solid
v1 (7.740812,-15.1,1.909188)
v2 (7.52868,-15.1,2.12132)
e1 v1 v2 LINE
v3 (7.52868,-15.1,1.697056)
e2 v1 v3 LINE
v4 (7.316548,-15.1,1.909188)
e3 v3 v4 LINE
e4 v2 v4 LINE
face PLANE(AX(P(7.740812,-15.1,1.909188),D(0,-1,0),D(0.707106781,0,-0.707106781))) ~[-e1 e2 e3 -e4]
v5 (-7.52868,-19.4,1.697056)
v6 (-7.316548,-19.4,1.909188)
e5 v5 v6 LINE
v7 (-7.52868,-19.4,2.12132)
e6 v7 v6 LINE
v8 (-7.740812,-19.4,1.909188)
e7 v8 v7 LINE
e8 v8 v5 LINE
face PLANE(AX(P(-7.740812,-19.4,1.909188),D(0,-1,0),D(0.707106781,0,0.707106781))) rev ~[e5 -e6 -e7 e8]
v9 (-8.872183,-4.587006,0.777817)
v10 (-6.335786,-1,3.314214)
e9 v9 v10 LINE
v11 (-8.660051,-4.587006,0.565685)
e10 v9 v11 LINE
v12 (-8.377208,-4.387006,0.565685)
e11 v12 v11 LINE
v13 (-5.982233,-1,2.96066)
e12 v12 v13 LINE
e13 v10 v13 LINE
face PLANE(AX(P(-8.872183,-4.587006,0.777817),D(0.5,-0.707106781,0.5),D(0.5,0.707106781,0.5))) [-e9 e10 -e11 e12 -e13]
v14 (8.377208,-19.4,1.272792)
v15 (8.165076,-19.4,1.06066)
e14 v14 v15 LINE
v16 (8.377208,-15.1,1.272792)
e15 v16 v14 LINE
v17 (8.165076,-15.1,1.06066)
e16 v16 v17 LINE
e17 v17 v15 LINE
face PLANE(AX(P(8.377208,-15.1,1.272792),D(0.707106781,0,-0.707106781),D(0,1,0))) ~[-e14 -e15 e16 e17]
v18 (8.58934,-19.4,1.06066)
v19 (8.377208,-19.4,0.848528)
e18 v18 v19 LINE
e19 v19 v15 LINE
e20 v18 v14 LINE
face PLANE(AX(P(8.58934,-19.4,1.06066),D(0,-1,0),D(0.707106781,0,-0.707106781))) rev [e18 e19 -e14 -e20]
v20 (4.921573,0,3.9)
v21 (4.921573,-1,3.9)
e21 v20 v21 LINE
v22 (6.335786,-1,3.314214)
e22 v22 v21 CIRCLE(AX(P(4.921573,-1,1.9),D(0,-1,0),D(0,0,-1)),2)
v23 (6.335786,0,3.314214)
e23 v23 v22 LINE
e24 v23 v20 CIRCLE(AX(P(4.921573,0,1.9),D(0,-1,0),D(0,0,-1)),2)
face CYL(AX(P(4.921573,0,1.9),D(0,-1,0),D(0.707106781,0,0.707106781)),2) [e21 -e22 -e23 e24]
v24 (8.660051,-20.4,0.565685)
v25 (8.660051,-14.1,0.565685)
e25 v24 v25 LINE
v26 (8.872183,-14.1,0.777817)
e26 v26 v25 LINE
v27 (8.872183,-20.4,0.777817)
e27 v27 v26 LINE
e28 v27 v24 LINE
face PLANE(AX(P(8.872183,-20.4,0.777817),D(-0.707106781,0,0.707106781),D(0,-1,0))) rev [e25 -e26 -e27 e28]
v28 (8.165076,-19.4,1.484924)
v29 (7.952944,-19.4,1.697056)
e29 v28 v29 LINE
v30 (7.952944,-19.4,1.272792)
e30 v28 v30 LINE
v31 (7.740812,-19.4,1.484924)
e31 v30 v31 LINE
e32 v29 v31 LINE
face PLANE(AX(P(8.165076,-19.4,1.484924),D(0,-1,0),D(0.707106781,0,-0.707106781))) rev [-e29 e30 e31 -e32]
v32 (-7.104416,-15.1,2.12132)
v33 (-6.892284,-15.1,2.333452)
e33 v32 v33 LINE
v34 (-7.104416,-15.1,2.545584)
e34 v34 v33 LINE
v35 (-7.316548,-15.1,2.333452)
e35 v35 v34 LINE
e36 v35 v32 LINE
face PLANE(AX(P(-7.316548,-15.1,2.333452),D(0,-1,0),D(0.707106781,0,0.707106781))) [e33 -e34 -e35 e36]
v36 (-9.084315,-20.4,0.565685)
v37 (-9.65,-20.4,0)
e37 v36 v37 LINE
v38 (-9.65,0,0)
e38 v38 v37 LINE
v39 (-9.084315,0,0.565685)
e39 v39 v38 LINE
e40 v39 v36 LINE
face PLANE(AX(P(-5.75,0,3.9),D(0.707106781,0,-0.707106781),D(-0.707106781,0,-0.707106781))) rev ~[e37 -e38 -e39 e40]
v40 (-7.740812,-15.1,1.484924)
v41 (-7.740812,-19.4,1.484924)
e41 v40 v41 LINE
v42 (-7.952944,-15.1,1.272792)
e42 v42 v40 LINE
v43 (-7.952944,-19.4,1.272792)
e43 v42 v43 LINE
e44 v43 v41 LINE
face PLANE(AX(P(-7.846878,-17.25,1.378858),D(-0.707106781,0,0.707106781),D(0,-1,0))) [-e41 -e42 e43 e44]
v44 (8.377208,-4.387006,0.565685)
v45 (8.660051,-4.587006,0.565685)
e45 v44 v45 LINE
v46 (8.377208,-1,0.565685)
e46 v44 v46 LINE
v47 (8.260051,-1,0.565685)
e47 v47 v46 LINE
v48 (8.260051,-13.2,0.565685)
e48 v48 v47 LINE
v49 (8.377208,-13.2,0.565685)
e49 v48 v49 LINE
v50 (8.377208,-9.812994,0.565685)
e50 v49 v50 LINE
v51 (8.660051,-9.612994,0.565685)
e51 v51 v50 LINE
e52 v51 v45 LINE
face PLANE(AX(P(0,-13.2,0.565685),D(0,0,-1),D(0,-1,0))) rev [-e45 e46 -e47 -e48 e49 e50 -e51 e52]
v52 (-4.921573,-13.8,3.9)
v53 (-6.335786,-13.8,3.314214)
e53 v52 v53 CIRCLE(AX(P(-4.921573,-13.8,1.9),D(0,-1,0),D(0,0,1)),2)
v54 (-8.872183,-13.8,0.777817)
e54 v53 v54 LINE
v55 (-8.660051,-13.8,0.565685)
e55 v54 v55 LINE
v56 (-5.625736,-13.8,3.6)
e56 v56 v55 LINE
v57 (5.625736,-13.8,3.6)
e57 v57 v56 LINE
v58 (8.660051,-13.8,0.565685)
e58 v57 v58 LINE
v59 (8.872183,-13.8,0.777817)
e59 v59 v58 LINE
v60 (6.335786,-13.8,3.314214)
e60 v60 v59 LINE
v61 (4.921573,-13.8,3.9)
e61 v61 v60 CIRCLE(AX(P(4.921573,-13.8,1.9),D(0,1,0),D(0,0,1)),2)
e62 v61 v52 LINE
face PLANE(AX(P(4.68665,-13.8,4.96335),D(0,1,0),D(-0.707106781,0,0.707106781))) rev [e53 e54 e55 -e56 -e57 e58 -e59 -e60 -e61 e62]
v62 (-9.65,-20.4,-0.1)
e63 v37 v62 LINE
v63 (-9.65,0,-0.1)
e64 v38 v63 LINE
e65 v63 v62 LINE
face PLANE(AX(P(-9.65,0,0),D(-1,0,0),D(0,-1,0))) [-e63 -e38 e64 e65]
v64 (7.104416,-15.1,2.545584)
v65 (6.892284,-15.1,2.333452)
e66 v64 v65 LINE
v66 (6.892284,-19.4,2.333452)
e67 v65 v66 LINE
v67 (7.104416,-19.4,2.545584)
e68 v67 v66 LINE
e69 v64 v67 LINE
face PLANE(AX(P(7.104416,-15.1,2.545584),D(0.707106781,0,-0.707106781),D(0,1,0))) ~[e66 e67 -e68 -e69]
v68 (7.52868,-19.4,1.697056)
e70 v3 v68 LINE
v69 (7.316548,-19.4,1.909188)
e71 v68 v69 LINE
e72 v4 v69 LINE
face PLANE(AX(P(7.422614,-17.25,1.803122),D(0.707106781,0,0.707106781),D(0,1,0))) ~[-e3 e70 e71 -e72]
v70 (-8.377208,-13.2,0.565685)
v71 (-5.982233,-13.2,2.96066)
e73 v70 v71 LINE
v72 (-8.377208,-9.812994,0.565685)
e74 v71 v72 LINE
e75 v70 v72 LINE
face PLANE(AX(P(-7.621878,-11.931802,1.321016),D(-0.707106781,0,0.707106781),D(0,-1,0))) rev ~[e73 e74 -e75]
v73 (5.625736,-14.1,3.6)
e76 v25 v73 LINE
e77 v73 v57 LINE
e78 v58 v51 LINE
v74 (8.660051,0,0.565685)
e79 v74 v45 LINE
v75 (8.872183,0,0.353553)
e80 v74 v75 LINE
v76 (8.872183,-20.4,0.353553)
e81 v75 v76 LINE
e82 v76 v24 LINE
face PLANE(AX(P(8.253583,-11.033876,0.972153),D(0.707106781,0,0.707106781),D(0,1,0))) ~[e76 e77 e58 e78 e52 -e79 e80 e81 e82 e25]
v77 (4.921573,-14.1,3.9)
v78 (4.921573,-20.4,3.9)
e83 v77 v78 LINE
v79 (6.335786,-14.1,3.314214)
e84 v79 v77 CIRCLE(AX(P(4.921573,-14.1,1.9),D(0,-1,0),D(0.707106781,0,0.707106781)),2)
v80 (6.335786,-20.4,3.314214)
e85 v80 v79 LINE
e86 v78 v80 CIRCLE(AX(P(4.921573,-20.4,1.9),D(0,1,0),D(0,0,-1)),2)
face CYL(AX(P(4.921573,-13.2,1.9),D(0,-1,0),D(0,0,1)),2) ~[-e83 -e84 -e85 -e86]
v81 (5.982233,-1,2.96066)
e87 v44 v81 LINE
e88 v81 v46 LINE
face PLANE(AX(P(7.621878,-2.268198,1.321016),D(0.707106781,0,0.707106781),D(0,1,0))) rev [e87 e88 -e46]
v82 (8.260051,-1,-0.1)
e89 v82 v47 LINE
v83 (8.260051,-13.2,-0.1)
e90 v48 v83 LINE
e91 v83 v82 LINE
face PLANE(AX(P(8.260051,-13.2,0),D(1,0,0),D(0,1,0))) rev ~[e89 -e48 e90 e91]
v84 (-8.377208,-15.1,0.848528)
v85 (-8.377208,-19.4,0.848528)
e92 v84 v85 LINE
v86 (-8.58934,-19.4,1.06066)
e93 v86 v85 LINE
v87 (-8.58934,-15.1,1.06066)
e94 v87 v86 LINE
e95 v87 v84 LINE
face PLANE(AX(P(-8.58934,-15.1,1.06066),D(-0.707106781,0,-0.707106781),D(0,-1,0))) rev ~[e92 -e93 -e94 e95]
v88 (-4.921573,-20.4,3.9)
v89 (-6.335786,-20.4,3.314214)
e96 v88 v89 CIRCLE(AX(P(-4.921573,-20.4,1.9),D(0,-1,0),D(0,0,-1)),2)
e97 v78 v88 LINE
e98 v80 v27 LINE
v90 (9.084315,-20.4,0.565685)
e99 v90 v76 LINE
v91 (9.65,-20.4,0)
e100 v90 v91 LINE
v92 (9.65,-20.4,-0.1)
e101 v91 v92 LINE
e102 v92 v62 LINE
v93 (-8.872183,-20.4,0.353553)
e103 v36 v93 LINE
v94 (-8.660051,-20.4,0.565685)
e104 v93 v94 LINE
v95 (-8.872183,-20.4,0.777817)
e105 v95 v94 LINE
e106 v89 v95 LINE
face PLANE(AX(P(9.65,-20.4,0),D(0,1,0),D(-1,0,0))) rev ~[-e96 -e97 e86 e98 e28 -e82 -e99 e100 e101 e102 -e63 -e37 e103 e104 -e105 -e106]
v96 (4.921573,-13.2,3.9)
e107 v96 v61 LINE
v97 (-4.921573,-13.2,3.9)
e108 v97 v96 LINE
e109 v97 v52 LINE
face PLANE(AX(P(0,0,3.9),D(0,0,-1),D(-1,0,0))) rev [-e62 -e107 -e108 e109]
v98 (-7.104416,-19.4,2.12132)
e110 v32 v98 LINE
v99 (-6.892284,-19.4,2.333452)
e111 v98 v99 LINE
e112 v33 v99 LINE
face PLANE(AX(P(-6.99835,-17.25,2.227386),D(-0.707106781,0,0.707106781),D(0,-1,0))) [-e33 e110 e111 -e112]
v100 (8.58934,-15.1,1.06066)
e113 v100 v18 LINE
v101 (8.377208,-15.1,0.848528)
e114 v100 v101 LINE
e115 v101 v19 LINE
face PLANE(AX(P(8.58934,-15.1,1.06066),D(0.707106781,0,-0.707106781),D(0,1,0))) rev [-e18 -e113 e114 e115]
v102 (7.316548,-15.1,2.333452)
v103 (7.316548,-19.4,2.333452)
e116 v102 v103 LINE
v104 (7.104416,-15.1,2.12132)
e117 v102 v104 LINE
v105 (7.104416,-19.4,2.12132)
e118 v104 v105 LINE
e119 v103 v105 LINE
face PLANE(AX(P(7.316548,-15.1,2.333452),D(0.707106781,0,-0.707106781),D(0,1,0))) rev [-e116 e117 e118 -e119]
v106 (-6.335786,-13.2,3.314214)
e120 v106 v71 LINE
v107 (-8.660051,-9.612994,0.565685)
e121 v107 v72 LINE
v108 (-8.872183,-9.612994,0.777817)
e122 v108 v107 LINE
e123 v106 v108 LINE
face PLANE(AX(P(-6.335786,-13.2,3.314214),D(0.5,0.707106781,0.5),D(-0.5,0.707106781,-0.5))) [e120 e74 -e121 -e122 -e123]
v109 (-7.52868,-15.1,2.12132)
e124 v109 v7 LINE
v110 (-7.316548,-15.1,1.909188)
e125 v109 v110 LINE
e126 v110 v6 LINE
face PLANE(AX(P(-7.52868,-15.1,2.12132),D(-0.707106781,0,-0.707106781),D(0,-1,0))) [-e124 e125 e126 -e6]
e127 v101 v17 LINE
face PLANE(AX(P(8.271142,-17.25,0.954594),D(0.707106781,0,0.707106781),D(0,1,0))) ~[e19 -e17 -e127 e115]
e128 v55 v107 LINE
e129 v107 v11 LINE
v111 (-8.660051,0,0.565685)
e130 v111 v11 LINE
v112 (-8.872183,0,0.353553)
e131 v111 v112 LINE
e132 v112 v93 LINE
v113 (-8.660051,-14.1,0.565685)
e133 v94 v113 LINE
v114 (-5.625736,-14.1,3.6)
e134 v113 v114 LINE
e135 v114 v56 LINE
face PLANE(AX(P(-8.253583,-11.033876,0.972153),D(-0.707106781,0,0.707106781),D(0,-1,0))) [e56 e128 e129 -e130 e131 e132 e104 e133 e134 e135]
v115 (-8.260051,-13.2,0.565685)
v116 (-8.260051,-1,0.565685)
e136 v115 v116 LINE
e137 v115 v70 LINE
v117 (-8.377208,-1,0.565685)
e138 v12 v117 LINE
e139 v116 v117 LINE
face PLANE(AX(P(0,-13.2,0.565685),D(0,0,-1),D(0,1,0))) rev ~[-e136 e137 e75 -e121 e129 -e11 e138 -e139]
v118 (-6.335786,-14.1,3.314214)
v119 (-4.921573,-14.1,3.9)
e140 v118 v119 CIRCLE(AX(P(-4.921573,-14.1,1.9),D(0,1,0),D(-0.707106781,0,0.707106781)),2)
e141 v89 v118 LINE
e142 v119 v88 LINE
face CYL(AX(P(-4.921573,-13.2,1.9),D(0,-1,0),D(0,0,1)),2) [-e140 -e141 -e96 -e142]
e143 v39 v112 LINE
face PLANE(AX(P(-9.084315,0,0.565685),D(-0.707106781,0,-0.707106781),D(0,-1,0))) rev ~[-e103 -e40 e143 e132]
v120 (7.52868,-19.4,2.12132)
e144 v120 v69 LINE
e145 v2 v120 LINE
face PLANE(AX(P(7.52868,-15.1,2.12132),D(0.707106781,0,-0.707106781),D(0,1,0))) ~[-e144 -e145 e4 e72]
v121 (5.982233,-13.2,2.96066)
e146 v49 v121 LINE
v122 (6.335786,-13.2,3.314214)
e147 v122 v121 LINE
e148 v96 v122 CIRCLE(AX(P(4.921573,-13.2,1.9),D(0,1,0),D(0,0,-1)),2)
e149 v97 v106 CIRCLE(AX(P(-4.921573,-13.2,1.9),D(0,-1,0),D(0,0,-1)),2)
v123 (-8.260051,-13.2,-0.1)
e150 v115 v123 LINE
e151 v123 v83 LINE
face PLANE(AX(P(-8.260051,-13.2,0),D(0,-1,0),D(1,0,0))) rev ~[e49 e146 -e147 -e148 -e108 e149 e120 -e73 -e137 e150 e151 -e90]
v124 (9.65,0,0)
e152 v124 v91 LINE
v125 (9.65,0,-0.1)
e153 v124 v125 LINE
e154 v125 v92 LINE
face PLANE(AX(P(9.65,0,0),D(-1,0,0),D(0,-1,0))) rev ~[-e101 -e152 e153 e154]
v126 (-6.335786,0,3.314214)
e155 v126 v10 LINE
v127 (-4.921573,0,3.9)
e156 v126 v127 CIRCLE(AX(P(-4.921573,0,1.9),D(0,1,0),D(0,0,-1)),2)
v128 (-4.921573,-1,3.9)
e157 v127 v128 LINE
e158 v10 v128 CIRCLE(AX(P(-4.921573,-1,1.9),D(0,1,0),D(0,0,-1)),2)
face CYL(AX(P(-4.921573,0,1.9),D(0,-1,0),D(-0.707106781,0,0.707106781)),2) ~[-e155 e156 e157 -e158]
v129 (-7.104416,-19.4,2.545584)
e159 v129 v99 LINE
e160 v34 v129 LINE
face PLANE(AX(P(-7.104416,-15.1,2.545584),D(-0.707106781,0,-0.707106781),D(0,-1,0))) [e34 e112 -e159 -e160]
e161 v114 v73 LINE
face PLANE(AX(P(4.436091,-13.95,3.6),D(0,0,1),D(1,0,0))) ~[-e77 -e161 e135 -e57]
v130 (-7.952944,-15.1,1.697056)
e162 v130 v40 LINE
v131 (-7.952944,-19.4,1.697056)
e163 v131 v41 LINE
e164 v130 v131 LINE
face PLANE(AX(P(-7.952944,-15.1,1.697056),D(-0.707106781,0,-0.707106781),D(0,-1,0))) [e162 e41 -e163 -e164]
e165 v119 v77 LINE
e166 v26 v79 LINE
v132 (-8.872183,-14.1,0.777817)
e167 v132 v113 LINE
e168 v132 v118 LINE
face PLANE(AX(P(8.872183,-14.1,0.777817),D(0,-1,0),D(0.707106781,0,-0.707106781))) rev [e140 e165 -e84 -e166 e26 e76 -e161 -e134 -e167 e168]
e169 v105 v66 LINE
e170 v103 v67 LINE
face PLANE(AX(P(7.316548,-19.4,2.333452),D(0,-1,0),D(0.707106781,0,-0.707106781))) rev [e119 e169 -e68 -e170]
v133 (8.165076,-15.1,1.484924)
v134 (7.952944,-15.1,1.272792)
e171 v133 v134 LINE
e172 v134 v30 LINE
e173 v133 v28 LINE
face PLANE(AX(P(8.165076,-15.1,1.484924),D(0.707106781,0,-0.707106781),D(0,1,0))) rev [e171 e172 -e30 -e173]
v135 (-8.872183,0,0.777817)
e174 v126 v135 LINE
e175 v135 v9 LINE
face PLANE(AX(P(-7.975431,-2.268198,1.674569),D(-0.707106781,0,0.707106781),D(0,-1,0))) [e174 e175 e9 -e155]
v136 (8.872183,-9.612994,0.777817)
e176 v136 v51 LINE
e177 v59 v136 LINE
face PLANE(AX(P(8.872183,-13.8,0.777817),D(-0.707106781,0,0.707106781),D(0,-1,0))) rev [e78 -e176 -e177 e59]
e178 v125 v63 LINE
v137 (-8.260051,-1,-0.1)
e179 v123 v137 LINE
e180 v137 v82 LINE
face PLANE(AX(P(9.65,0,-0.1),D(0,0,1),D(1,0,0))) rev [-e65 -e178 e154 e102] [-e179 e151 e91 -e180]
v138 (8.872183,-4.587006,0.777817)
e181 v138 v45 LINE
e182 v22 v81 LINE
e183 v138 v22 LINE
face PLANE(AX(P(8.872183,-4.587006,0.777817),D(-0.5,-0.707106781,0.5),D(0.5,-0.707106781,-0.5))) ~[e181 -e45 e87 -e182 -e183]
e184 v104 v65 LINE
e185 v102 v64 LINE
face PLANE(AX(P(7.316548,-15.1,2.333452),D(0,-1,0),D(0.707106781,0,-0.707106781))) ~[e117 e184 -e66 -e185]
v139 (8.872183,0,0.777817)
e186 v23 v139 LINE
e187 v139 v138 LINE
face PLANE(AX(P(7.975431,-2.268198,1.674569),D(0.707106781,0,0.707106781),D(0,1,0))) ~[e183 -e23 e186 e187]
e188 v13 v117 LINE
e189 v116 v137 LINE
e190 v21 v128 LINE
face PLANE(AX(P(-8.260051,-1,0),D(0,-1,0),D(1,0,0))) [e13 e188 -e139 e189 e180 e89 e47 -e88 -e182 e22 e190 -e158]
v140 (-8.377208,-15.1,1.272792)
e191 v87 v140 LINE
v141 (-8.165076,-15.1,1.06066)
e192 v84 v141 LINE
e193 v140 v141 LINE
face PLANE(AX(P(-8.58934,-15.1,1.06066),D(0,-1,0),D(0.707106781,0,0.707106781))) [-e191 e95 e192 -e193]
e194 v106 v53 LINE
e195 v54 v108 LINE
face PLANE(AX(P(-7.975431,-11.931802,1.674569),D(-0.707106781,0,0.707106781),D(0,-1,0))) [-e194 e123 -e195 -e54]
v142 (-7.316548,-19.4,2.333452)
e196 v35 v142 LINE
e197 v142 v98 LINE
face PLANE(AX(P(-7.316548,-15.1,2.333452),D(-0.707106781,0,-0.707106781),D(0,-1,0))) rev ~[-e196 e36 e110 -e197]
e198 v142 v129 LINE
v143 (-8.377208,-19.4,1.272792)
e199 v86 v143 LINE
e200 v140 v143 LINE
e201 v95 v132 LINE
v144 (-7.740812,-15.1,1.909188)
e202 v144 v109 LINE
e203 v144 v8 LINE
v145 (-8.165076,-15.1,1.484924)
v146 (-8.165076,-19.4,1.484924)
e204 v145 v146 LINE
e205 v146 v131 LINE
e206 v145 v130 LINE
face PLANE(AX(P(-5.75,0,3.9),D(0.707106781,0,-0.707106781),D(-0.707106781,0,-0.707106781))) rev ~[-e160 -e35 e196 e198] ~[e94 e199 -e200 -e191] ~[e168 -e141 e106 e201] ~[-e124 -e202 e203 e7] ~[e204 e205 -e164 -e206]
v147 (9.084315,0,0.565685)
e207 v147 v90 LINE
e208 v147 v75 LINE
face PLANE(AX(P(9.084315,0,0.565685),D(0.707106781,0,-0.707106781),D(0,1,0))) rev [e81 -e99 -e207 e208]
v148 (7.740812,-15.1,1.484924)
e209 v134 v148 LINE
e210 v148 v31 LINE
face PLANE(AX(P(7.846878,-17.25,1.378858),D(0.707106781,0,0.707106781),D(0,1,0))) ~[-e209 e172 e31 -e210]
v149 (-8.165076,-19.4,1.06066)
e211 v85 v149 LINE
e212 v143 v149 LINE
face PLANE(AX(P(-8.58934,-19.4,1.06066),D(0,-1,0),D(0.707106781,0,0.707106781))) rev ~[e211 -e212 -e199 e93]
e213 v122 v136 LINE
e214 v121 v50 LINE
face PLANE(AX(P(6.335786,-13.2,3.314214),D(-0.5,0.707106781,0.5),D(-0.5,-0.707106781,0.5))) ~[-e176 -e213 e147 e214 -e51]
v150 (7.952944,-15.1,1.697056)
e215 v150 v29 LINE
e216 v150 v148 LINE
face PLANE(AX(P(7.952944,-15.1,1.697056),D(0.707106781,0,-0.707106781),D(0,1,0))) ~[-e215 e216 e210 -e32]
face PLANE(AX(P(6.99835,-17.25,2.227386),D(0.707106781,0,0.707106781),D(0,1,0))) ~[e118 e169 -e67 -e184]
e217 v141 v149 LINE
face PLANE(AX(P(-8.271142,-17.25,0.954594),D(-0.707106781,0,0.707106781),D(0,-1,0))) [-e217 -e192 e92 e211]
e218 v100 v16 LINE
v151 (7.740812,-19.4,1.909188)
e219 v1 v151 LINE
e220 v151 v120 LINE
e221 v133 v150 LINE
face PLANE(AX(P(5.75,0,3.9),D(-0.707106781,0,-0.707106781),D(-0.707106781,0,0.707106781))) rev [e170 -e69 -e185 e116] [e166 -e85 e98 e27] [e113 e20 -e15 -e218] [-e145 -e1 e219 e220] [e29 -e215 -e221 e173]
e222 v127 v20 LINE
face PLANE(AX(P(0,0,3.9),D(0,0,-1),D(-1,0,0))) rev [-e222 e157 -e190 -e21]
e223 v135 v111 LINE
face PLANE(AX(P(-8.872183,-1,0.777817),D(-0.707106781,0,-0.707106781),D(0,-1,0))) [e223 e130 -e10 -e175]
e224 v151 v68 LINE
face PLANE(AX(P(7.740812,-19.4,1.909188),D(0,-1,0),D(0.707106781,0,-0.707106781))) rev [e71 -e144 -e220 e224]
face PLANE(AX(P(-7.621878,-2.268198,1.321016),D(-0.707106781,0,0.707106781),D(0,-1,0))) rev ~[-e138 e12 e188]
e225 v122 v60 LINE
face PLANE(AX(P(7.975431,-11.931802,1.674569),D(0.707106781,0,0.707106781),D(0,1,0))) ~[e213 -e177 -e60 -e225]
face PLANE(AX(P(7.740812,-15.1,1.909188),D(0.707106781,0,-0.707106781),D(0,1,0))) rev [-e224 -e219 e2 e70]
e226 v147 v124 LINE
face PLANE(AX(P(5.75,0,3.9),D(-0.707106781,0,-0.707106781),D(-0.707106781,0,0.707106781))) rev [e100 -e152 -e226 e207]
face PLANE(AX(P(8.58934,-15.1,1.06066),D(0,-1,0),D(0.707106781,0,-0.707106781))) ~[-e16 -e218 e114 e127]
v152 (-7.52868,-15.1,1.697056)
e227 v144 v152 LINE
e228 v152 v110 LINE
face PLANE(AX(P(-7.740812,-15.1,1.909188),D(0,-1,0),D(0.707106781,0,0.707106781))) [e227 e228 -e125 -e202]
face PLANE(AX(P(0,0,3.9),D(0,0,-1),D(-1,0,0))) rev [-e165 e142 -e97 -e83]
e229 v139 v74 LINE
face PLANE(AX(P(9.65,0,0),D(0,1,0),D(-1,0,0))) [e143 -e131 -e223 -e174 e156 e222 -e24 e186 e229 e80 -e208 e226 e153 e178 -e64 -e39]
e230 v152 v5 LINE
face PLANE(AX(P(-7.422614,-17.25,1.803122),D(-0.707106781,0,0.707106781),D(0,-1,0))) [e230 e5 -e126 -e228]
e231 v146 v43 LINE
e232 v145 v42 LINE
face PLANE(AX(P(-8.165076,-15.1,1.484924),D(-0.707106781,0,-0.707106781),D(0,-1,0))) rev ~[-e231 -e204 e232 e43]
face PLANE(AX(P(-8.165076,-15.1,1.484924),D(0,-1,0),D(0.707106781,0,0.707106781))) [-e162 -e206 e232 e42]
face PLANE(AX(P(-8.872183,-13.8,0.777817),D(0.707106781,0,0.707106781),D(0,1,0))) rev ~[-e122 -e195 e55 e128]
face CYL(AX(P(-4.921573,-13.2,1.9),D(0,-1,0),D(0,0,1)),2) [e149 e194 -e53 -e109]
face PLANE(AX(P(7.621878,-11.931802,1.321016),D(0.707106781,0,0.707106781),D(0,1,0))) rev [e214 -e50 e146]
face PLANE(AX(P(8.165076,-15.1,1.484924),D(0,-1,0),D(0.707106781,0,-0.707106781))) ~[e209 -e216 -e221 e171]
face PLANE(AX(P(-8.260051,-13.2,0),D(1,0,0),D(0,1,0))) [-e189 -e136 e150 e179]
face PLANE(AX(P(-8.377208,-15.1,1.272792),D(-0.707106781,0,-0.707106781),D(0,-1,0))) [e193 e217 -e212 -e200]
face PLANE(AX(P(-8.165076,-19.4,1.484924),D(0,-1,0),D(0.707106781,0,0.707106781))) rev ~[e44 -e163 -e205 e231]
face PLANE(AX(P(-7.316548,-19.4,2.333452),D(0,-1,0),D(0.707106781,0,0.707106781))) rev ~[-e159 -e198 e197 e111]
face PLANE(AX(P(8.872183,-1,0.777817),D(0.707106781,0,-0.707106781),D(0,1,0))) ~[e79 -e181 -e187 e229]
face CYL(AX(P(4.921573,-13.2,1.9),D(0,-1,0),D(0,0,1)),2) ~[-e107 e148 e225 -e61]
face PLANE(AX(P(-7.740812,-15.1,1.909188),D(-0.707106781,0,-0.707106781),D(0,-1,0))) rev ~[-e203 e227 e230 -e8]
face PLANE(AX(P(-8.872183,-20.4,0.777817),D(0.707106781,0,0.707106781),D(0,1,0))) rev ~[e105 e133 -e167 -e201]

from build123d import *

# Parameters (mm, degrees)
F1_DEPTH  = 20.4
F3_DEPTH  = 0.3
F4_W      = 12.2
F4_H      = 3.3343145751
F5_DEPTH  = 8.8731825407
F6_W      = 8.2600505063
F6_H      = 12.2
F7_DEPTH  = 25
F8_W      = 4.3
F8_H      = 0.3
F9_DEPTH  = 0.3
F10_F1_R  = 2
F10_F2_R  = 2
F12_DEPTH = 0.5
F13_W     = 8.8721825407
F13_H     = 0.3
F14_DEPTH = 0.3
F16_DEPTH = 0.1


# Not quite as in the source:
# - a feature names something its author has since deleted; it is built from what else it names


with BuildPart() as f1:
    # F0 (on Front) → F1 (new body)
    with BuildSketch(Plane.XZ):
        Polygon((-9.65, 0), (0, 0), (0, 3.9), (-5.75, 3.9), align=None)
    extrude(amount=F1_DEPTH)

    # F2 (on face) → F3 (cut)
    with BuildSketch(Plane(origin=(-4.825, 0, 4.825), x_dir=(0, -1, 0), z_dir=(-0.7071067812, 0, 0.7071067812))):
        Polygon((13.8, -5.7235804385), (0, -5.7235804385), (0, -6.0235804385), (20.4, -6.0235804385), (20.4, -5.7235804385), (14.1, -5.7235804385), (14.1, 0.1956567054), (13.8, 0.1956567054), align=None)
    extrude(amount=-F3_DEPTH, mode=Mode.SUBTRACT)

    # F4 (on face) → F5 (cut, through all)
    with BuildSketch(Plane.YZ):
        with Locations((-7.1, 2.2328427125)):
            Rectangle(F4_W, F4_H)
    extrude(amount=-F5_DEPTH, mode=Mode.SUBTRACT)

    # F6 (on face) → F7 (cut)
    with BuildSketch(Plane.XY.offset(0.5656854249)):
        with Locations((-4.1300252532, -7.1)):
            Rectangle(F6_W, F6_H)
    extrude(amount=-F7_DEPTH, mode=Mode.SUBTRACT)

    # F8 (on face) → F9 (cut)
    with BuildSketch(Plane(origin=(-4.825, 0, 4.825), x_dir=(0, -1, 0), z_dir=(-0.7071067812, 0, 0.7071067812))):
        with Locations((17.25, -3.3735804385)):
            Rectangle(F8_W, F8_H)
        with Locations((17.25, -3.9735804385)):
            Rectangle(F8_W, F8_H)
        with Locations((17.25, -5.1735804385)):
            Rectangle(F8_W, F8_H)
        with Locations((17.25, -4.5735804385)):
            Rectangle(F8_W, F8_H)
    extrude(amount=-F9_DEPTH, mode=Mode.SUBTRACT)

    # F10: fillet of radius 2 on 3 edges, made by hand

    # F10_f1
    f10_f1_edges = [f1.edges().sort_by_distance(p)[0] for p in [
        (-5.75, -0.5, 3.9),
    ]]
    fillet(f10_f1_edges, radius=F10_F1_R)

    # F10_f2
    f10_f2_edges = [f1.edges().sort_by_distance(p)[0] for p in [
        (-5.75, -13.5, 3.9),
    ]]
    fillet(f10_f2_edges, radius=F10_F2_R)

    # F11 (on face) → F12 (join)
    with BuildSketch(Plane(origin=(-4.825, 0, 4.825), x_dir=(0, -1, 0), z_dir=(-0.7071067812, 0, 0.7071067812))):
        Polygon((1, -2.1365746699), (1, -5.7235804385), (4.5870057685, -5.7235804385), align=None)
        Polygon((13.2, -5.7235804385), (13.2, -2.1365746699), (9.6129942315, -5.7235804385), align=None)
    extrude(amount=-F12_DEPTH)

    # F13 (on face) → F14 (cut)
    with BuildSketch(Plane.XY.offset(3.9)):
        with Locations((-4.4360912703, -13.95)):
            Rectangle(F13_W, F13_H)
    extrude(amount=-F14_DEPTH, mode=Mode.SUBTRACT)

    # F15: F1 across face


with BuildPart() as f1_1:
    add(f1.part)
    add(f1.part.mirror(Plane(origin=(0, -16.8091639871, 1.9442122186), x_dir=(0, 1, 0), z_dir=(1, 0, 0))))

    # F16 (add): a face of the model
    f16_faces = [f1_1.faces().sort_by_distance(p)[0] for p in [
        (0, -13.4511563716, 0),
    ]]
    extrude(f16_faces, amount=F16_DEPTH)


solid = f1_1.part
